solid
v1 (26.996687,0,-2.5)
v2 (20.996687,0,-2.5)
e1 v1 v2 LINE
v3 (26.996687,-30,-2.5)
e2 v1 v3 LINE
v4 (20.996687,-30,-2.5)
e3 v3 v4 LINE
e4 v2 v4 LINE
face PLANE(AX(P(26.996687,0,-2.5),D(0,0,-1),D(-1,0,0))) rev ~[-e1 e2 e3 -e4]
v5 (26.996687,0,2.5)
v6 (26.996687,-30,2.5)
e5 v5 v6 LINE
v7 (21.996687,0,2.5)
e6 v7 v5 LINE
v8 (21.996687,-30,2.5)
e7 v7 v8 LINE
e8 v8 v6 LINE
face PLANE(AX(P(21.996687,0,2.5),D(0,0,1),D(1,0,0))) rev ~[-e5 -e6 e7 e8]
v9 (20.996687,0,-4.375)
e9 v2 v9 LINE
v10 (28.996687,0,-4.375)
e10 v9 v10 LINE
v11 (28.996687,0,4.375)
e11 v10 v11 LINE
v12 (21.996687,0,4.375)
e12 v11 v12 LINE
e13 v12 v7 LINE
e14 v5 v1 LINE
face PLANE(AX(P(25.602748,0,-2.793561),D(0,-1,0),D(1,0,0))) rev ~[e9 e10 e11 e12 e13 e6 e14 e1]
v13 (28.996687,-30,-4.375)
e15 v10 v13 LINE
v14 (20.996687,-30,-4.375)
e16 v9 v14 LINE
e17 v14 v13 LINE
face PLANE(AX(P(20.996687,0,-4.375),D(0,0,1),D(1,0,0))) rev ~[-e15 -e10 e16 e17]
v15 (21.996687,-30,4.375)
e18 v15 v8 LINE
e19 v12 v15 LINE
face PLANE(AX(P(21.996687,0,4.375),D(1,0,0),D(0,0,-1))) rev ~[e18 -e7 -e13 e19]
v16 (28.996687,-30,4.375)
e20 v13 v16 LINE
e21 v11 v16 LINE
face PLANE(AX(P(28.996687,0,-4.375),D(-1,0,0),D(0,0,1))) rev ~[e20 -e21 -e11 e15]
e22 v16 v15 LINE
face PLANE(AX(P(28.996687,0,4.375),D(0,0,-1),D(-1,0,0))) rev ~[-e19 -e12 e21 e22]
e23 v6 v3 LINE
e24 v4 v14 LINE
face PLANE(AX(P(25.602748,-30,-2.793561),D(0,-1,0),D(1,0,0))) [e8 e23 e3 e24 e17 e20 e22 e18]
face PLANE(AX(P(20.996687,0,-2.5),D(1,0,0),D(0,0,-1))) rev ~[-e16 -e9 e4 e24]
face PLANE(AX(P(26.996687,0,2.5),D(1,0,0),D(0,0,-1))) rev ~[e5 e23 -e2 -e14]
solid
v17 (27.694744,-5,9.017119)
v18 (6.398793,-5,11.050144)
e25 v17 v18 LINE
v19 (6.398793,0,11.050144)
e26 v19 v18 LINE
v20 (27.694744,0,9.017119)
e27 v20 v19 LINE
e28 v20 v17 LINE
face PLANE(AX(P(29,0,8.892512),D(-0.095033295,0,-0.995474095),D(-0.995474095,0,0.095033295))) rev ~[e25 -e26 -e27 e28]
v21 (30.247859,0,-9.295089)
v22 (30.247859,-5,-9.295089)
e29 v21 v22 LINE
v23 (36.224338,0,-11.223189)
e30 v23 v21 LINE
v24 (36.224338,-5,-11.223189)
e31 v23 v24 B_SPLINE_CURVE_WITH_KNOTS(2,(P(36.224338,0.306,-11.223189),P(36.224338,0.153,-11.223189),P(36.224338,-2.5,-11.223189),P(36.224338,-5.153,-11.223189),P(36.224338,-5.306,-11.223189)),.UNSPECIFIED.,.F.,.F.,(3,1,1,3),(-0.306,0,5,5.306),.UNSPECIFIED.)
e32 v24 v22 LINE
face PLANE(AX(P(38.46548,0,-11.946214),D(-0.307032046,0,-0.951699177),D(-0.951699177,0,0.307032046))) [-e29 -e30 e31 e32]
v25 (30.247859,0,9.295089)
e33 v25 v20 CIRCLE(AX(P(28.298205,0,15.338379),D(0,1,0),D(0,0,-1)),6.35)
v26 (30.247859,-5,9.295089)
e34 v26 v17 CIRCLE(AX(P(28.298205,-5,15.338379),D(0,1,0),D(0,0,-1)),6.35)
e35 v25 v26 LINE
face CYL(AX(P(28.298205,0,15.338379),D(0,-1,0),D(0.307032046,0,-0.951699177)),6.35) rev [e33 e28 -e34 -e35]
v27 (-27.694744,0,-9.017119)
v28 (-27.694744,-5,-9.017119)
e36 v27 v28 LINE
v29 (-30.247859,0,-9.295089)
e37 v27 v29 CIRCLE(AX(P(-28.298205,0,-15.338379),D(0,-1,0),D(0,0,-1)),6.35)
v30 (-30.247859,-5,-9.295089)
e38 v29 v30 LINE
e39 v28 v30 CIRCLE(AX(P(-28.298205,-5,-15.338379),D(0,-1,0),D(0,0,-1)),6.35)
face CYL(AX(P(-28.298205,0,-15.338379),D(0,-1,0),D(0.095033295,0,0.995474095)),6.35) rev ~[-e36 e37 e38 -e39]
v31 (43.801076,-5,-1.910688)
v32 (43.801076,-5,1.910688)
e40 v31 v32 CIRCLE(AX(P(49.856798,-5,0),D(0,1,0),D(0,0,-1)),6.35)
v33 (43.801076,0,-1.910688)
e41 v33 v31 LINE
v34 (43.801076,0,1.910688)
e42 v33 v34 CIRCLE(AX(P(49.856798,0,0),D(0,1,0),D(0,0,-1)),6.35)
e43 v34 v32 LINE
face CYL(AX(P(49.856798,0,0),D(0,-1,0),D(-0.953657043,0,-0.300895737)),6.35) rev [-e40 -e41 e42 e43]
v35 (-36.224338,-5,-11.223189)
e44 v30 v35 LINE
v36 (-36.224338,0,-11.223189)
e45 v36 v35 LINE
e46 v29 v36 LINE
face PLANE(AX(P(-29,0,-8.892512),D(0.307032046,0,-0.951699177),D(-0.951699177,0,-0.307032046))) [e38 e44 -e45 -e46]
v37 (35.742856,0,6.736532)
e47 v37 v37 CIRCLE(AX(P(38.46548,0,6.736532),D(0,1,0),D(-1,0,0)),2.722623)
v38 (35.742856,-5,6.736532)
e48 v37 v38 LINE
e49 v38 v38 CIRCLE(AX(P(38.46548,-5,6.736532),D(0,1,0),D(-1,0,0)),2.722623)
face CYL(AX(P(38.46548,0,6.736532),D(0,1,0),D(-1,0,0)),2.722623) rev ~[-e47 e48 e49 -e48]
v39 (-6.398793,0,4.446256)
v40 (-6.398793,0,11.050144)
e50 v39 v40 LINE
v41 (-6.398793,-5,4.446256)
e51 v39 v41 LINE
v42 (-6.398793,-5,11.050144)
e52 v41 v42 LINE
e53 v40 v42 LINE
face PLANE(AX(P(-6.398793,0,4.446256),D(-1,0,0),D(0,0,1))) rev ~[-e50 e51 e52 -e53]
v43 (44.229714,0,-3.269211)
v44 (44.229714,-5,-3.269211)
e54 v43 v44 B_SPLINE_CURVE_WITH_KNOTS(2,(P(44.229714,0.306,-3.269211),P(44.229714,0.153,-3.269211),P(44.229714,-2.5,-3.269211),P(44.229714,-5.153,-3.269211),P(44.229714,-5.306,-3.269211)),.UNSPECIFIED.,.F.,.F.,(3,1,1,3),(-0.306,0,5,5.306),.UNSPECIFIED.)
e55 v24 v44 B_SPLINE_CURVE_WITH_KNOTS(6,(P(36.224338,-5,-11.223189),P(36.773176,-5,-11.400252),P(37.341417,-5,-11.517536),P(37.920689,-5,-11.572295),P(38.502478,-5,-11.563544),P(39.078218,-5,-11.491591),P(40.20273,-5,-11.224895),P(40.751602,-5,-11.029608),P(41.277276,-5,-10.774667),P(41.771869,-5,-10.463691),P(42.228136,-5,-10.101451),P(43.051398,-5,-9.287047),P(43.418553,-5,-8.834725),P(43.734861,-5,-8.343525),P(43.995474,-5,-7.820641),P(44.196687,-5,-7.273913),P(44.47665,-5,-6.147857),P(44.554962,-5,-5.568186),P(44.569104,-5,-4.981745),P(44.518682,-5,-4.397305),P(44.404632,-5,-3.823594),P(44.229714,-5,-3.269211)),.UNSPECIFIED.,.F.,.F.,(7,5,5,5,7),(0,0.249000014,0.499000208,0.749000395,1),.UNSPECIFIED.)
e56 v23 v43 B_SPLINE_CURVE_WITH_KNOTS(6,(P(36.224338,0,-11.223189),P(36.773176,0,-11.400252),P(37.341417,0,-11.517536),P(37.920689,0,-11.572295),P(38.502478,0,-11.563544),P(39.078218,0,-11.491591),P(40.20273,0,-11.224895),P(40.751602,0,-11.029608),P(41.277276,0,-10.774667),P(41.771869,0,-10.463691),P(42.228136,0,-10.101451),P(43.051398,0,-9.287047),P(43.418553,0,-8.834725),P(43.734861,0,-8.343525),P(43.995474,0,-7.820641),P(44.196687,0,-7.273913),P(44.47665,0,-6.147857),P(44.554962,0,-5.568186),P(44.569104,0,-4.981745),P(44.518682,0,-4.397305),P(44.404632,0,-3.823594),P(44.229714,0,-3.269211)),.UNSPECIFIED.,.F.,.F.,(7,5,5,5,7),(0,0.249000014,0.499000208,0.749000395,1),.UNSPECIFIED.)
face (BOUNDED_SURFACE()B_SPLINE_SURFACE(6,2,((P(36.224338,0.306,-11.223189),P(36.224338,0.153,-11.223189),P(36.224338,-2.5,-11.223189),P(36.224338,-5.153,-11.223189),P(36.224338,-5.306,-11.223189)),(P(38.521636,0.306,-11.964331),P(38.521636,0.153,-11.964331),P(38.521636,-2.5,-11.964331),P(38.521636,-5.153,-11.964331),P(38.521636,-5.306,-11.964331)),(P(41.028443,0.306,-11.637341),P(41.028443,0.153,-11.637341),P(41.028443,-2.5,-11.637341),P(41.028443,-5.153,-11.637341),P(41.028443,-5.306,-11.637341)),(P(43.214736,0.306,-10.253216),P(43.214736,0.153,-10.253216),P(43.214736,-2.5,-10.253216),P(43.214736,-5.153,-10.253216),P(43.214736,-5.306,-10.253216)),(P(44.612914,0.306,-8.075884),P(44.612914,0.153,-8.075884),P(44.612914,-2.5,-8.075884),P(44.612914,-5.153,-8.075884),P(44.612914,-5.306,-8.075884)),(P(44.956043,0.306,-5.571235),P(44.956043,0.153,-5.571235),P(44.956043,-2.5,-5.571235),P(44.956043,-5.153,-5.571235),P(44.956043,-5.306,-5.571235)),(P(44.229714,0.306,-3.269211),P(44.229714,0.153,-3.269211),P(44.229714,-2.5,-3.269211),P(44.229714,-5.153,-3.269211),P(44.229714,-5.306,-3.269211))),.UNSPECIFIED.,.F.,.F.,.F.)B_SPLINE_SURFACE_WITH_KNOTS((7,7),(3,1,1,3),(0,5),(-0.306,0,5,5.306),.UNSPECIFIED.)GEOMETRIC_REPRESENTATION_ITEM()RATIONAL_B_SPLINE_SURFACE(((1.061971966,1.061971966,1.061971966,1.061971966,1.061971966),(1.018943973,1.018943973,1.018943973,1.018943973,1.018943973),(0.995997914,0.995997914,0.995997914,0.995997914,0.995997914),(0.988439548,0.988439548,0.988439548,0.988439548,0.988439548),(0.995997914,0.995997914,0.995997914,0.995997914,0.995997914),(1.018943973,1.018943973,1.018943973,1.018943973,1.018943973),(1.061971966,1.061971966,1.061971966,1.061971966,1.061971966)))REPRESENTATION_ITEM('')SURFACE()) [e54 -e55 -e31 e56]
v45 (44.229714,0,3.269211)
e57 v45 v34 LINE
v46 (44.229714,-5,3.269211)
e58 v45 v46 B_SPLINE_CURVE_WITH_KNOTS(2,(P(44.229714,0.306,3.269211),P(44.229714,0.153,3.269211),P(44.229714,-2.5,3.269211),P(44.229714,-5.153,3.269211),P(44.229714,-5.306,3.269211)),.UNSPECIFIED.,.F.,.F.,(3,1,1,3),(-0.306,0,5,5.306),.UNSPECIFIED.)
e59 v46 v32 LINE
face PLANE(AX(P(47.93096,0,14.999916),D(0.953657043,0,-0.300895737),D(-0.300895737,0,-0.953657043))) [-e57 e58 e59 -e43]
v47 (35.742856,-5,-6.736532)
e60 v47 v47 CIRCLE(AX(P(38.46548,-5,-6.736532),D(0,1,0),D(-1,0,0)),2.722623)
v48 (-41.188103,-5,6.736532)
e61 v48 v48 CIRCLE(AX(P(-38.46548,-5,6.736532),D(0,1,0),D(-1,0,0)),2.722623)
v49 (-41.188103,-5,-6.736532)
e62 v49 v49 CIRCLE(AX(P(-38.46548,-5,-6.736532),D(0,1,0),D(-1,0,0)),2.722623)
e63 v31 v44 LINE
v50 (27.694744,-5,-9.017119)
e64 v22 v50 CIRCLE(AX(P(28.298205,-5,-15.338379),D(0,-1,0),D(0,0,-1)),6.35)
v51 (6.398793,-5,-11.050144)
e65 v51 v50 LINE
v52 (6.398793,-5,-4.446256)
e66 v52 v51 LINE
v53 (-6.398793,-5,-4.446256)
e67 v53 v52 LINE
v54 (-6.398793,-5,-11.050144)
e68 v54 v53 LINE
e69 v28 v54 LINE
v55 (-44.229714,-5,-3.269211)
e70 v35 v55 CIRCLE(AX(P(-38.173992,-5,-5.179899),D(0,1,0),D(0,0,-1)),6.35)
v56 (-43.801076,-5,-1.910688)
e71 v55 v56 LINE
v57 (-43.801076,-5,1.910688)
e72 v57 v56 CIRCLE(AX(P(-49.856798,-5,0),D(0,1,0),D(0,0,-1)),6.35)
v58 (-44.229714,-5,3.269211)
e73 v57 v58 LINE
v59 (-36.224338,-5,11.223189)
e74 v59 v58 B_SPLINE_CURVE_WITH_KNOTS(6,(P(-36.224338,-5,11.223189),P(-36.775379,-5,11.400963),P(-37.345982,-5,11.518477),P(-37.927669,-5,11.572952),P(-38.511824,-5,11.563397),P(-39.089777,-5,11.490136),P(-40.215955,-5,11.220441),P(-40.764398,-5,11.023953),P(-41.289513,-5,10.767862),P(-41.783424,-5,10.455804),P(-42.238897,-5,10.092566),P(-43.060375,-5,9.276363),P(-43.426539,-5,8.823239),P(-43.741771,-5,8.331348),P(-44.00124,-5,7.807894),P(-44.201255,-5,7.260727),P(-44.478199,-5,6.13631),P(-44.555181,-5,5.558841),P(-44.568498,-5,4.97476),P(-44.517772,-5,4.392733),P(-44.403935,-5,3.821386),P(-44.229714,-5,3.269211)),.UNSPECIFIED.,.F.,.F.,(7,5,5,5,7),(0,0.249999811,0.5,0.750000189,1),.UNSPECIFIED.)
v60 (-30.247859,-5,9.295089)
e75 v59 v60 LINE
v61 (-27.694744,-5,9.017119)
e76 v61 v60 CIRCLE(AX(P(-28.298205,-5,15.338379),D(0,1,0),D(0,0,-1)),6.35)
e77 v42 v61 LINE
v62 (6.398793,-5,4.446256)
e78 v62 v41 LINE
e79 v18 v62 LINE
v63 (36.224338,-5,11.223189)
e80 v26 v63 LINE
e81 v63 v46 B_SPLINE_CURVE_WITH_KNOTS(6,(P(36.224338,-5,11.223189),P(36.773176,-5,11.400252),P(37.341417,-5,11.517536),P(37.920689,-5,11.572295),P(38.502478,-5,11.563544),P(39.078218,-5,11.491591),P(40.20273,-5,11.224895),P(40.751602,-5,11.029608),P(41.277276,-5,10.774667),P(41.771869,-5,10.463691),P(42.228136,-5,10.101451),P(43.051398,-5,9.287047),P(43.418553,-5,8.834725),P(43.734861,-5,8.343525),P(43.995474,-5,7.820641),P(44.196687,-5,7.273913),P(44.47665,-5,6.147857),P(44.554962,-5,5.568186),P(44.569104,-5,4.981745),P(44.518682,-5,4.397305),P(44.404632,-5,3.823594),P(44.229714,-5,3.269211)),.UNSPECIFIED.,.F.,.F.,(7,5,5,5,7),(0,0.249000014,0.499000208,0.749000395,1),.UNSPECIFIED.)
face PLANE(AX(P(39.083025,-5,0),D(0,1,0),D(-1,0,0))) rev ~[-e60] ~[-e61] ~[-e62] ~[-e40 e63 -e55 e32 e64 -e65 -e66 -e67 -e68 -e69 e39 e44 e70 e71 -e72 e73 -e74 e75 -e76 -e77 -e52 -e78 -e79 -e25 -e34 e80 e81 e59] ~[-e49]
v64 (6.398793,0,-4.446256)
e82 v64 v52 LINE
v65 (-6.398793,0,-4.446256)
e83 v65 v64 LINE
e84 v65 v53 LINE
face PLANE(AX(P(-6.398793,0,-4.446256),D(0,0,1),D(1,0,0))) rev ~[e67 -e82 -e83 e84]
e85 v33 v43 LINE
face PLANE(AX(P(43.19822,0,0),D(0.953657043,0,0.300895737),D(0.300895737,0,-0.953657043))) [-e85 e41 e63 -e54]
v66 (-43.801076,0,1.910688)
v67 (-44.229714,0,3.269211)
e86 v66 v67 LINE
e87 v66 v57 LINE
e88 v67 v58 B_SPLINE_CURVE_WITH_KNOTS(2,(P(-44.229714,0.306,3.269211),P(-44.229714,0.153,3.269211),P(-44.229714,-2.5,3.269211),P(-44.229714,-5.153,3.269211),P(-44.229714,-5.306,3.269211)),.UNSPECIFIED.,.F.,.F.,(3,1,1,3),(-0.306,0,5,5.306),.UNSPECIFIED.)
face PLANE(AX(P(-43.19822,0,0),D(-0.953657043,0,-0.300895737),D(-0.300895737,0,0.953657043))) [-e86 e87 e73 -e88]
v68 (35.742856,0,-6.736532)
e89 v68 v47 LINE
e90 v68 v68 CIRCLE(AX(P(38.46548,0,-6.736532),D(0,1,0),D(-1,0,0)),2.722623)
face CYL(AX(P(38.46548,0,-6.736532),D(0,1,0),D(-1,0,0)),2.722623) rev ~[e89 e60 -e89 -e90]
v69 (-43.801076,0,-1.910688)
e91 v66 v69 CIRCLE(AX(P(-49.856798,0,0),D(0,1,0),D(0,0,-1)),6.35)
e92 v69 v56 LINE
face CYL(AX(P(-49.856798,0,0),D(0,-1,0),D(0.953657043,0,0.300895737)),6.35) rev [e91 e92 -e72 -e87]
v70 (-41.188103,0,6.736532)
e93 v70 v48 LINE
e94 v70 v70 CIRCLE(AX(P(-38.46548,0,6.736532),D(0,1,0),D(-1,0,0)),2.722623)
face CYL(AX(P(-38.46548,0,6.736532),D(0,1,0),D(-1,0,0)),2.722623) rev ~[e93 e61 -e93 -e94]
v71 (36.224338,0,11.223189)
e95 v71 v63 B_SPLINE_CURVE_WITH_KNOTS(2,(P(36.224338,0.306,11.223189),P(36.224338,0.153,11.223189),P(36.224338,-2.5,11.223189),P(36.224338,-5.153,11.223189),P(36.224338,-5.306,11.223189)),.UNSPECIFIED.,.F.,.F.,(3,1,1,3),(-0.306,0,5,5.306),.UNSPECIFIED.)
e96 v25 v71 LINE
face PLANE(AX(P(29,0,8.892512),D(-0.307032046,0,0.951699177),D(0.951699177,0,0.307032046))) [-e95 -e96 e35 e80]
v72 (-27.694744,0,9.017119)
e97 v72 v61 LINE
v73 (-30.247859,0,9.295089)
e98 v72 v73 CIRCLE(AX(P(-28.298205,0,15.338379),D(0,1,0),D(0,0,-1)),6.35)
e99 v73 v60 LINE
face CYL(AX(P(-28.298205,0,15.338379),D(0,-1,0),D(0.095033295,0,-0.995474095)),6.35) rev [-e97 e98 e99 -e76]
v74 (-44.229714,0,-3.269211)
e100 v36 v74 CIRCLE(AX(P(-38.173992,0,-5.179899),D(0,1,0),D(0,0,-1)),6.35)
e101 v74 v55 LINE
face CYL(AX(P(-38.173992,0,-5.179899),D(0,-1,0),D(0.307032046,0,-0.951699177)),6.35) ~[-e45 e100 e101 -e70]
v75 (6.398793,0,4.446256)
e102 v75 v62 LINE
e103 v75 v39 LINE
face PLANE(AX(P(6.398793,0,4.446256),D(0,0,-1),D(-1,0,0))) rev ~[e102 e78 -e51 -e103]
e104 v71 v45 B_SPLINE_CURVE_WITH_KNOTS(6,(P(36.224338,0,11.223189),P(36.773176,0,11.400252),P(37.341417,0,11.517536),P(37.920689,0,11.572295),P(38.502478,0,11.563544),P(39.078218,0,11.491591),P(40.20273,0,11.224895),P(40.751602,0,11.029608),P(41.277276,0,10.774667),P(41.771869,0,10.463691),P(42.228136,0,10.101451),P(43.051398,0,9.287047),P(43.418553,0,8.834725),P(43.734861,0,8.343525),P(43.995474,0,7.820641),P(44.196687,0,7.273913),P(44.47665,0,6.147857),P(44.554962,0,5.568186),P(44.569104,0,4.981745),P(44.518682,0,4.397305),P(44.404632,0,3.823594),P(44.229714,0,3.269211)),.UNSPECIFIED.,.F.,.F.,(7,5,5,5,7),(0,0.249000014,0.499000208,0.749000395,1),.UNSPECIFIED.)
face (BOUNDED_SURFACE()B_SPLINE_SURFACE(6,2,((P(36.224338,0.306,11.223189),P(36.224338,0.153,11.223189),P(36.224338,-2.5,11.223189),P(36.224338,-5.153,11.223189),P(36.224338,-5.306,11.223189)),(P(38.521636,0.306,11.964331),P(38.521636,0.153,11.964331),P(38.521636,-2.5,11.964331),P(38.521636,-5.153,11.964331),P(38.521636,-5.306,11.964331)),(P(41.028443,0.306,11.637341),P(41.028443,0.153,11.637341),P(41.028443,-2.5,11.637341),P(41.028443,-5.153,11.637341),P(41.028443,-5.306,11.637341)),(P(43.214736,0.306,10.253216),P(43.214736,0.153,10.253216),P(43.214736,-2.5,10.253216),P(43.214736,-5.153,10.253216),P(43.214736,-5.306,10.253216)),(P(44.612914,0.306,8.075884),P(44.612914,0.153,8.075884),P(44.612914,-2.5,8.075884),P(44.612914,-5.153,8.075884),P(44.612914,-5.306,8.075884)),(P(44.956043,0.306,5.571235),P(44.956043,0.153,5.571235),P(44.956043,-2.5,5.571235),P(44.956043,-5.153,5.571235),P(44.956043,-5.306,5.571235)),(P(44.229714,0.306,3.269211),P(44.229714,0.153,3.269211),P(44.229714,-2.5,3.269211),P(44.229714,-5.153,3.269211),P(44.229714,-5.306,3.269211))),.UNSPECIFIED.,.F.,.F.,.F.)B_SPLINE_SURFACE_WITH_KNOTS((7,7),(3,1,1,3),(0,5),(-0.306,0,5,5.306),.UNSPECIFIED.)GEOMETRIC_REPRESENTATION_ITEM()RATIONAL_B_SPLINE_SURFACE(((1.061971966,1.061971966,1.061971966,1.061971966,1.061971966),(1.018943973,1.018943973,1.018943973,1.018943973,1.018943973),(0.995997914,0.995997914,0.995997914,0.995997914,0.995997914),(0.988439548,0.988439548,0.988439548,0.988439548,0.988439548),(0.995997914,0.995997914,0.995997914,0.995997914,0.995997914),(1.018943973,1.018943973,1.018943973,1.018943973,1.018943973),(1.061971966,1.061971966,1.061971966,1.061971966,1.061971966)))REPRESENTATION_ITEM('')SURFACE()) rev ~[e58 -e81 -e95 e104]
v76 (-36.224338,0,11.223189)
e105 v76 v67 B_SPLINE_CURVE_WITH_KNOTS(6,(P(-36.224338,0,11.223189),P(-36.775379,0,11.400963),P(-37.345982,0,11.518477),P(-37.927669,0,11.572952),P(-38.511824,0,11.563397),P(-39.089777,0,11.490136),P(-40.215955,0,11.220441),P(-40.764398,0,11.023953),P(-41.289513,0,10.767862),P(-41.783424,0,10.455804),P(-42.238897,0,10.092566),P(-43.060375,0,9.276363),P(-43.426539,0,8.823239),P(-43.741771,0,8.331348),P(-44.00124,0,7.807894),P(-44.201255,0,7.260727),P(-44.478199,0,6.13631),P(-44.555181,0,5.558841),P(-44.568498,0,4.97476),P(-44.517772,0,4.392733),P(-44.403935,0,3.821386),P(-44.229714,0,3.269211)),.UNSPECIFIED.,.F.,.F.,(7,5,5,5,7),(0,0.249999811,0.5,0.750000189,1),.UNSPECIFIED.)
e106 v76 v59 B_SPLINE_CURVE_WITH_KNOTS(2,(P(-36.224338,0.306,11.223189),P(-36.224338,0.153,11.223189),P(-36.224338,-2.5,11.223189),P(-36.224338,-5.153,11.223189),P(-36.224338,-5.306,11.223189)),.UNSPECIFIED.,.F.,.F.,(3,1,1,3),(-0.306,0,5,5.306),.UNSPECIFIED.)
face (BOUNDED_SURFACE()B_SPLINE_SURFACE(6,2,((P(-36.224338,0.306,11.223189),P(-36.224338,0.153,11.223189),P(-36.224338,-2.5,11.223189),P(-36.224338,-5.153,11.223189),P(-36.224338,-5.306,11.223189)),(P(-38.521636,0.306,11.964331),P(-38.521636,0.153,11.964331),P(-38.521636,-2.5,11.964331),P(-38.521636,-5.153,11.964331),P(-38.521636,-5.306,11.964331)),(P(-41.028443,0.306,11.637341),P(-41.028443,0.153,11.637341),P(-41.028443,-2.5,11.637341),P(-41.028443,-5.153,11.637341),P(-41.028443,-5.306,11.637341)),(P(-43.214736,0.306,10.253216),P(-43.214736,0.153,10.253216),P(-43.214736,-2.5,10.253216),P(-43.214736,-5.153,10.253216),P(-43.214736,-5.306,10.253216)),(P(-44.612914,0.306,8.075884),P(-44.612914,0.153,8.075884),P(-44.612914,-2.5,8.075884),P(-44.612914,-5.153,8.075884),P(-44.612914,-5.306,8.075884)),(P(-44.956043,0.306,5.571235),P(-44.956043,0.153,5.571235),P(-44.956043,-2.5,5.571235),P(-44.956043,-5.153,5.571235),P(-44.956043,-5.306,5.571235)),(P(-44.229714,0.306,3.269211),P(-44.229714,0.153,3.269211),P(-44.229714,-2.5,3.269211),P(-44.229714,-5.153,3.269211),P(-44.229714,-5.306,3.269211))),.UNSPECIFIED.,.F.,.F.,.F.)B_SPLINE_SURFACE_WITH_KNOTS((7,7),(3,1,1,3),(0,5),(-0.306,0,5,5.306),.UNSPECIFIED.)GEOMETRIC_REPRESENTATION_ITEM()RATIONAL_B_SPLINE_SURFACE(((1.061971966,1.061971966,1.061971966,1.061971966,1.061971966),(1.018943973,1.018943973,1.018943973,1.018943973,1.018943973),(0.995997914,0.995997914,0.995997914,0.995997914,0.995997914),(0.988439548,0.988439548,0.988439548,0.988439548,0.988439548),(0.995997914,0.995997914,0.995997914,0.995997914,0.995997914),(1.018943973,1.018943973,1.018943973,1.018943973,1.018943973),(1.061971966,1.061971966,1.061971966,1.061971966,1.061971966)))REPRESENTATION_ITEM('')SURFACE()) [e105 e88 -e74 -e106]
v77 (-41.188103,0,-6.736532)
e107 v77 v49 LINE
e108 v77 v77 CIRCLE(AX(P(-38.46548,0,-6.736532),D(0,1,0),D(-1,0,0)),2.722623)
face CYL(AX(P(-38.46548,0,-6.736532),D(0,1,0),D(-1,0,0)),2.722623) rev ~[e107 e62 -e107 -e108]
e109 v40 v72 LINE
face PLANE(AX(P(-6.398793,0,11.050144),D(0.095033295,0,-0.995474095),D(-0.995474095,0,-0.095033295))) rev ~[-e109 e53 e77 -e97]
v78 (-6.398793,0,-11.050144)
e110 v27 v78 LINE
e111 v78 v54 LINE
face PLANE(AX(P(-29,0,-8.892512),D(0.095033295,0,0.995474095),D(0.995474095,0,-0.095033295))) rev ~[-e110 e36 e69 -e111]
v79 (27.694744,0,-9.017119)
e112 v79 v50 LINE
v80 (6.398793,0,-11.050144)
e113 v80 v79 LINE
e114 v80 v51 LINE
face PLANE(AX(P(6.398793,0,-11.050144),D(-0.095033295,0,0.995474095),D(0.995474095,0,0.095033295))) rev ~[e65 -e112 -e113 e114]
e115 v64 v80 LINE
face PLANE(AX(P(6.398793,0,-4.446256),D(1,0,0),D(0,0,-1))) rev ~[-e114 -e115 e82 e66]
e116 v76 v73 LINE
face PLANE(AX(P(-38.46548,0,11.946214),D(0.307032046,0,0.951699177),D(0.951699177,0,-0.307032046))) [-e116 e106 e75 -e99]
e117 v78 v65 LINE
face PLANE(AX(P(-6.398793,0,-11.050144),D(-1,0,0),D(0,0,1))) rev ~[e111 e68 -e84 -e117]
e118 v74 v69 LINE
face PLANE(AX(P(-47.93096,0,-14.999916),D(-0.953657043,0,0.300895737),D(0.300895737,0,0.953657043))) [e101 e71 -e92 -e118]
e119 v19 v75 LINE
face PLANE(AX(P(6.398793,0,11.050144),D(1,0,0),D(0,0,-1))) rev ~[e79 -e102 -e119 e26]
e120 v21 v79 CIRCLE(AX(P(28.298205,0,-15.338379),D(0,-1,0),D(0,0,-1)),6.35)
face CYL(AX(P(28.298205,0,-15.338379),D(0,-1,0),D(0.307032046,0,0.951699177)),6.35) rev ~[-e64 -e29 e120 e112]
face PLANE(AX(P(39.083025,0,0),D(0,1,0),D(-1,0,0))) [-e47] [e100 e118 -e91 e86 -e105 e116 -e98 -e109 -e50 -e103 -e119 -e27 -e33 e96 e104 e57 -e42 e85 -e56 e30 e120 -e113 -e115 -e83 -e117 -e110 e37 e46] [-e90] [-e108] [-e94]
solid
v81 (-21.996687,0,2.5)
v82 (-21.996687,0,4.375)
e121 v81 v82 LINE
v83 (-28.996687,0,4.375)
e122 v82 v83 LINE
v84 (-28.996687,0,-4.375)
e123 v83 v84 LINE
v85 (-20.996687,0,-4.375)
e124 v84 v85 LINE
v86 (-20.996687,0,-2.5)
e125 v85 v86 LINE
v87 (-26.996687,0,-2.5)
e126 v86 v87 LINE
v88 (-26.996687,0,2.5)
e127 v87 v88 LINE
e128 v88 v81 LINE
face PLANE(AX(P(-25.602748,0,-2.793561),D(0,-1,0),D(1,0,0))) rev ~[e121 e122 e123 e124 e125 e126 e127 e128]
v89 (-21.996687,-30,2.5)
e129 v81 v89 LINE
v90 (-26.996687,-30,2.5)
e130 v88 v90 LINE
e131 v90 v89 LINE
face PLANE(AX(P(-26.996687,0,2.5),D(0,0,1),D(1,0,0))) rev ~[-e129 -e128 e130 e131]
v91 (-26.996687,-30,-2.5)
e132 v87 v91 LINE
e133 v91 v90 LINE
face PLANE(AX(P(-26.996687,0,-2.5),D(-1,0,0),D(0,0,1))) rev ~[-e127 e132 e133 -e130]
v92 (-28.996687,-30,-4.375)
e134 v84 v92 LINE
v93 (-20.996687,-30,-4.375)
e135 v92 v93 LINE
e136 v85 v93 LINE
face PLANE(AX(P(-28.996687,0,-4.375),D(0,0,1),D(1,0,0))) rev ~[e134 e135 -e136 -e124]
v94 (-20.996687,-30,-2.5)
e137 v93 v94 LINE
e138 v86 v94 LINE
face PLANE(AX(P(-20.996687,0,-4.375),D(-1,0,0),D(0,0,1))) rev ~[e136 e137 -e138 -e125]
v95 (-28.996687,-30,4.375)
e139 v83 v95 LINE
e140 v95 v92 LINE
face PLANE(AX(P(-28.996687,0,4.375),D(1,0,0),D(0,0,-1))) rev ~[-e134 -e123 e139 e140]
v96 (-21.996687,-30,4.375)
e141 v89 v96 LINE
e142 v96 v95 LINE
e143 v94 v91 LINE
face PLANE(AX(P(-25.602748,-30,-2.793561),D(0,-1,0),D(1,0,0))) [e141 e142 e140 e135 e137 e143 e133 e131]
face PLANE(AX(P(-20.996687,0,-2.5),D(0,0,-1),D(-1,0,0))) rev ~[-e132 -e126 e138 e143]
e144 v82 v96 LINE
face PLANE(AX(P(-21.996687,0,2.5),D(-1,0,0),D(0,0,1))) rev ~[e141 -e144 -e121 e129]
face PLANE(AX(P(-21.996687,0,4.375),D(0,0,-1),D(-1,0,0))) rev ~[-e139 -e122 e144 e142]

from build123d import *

# Parameters (mm, degrees)
F2_DEPTH = 30
F3_DEPTH = 5
F4_R     = 2.7226233937
F5_DEPTH = 5
F6_R     = 6.35


# Not quite as in the source:
# - a feature names something its author has since deleted; it is built from what else it names


with BuildPart() as f2:
    # F0 (on Front) → F2 (new body)
    with BuildSketch(Plane.XZ):
        Polygon((20.9966870546, -4.375), (28.9966870546, -4.375), (28.9966870546, 0), (28.0000005364, 0), (26.9966870546, 0), (26.9966870546, -2.5), (20.9966870546, -2.5), align=None)
        Polygon((28.0000005364, 0), (28.9966870546, 0), (28.9966870546, 4.375), (21.9966870546, 4.375), (21.9966870546, 2.5), (26.9966870546, 2.5), (26.9966870546, 0), align=None)
    extrude(amount=F2_DEPTH)


with BuildPart() as f2b:
    # F0 (on Front) → F2, piece 2 (new body)
    with BuildSketch(Plane.XZ):
        Polygon((-26.9966870546, -2.5), (-26.9966870546, 0), (-28.0000005364, 0), (-28.9966870546, 0), (-28.9966870546, -4.375), (-20.9966870546, -4.375), (-20.9966870546, -2.5), align=None)
        Polygon((-28.0000005364, 0), (-26.9966870546, 0), (-26.9966870546, 2.5), (-21.9966870546, 2.5), (-21.9966870546, 4.375), (-28.9966870546, 4.375), (-28.9966870546, 0), align=None)
    extrude(amount=F2_DEPTH)


with BuildPart() as f3:
    # F1 (on Front) → F3 (new body)
    with BuildSketch(Plane.XZ):
        Polygon((29, -8.8925119489), (29, 8.8925119489), (6.3987928443, 11.0501443781), (6.3987928443, 4.4462559745), (0, 4.4462559745), (-6.3987928443, 4.4462559745), (-6.3987928443, 11.0501443781), (-29, 8.8925119489), (-29, -8.8925119489), (-6.3987928443, -11.0501443781), (-6.3987928443, -4.4462559745), (0, -4.4462559745), (6.3987928443, -4.4462559745), (6.3987928443, -11.0501443781), align=None)
    extrude(amount=F3_DEPTH)

    # F4 (on face) → F5 (join)
    with BuildSketch(Plane(origin=(0, 0, 0), x_dir=(-1, 0, 0), z_dir=(0, 1, 0))):
        Polygon((-29, -8.8925119489), (-29, 8.8925119489), (-38.4654798061, 11.9462138973), (-47.9309596121, 14.9999158457), (-43.1982197091, 0), (-47.9309596121, -14.9999158457), (-38.4654798061, -11.9462138973), align=None)
        with Locations((-38.4654798061, -6.7365324358)):
            Circle(F4_R, mode=Mode.SUBTRACT)
        with Locations((-38.4654798061, 6.7365324358)):
            Circle(F4_R, mode=Mode.SUBTRACT)
        Polygon((38.4654798061, 11.9462138973), (29, 8.8925119489), (29, -8.8925119489), (47.9309596121, -14.9999158457), (43.1982197091, 0), (47.9309596121, 14.9999158457), align=None)
        with Locations((38.4654798061, -6.7365324358)):
            Circle(F4_R, mode=Mode.SUBTRACT)
        with Locations((38.4654798061, 6.7365324358)):
            Circle(F4_R, mode=Mode.SUBTRACT)
    extrude(amount=-F5_DEPTH)

    # F6
    f6_edges = [f3.edges().sort_by_distance(p)[0] for p in [
        (43.19822, -2.5, 0),
        (47.93096, -2.5, 14.999916),
        (47.93096, -2.5, -14.999916),
        (29, -2.5, -8.892512),
        (-29, -2.5, -8.892512),
        (-47.93096, -2.5, -14.999916),
        (-43.19822, -2.5, 0),
        (-47.93096, -2.5, 14.999916),
        (-29, -2.5, 8.892512),
        (29, -2.5, 8.892512),
    ]]
    fillet(f6_edges, radius=F6_R)


solid = Compound([f2.part, f2b.part, f3.part])
